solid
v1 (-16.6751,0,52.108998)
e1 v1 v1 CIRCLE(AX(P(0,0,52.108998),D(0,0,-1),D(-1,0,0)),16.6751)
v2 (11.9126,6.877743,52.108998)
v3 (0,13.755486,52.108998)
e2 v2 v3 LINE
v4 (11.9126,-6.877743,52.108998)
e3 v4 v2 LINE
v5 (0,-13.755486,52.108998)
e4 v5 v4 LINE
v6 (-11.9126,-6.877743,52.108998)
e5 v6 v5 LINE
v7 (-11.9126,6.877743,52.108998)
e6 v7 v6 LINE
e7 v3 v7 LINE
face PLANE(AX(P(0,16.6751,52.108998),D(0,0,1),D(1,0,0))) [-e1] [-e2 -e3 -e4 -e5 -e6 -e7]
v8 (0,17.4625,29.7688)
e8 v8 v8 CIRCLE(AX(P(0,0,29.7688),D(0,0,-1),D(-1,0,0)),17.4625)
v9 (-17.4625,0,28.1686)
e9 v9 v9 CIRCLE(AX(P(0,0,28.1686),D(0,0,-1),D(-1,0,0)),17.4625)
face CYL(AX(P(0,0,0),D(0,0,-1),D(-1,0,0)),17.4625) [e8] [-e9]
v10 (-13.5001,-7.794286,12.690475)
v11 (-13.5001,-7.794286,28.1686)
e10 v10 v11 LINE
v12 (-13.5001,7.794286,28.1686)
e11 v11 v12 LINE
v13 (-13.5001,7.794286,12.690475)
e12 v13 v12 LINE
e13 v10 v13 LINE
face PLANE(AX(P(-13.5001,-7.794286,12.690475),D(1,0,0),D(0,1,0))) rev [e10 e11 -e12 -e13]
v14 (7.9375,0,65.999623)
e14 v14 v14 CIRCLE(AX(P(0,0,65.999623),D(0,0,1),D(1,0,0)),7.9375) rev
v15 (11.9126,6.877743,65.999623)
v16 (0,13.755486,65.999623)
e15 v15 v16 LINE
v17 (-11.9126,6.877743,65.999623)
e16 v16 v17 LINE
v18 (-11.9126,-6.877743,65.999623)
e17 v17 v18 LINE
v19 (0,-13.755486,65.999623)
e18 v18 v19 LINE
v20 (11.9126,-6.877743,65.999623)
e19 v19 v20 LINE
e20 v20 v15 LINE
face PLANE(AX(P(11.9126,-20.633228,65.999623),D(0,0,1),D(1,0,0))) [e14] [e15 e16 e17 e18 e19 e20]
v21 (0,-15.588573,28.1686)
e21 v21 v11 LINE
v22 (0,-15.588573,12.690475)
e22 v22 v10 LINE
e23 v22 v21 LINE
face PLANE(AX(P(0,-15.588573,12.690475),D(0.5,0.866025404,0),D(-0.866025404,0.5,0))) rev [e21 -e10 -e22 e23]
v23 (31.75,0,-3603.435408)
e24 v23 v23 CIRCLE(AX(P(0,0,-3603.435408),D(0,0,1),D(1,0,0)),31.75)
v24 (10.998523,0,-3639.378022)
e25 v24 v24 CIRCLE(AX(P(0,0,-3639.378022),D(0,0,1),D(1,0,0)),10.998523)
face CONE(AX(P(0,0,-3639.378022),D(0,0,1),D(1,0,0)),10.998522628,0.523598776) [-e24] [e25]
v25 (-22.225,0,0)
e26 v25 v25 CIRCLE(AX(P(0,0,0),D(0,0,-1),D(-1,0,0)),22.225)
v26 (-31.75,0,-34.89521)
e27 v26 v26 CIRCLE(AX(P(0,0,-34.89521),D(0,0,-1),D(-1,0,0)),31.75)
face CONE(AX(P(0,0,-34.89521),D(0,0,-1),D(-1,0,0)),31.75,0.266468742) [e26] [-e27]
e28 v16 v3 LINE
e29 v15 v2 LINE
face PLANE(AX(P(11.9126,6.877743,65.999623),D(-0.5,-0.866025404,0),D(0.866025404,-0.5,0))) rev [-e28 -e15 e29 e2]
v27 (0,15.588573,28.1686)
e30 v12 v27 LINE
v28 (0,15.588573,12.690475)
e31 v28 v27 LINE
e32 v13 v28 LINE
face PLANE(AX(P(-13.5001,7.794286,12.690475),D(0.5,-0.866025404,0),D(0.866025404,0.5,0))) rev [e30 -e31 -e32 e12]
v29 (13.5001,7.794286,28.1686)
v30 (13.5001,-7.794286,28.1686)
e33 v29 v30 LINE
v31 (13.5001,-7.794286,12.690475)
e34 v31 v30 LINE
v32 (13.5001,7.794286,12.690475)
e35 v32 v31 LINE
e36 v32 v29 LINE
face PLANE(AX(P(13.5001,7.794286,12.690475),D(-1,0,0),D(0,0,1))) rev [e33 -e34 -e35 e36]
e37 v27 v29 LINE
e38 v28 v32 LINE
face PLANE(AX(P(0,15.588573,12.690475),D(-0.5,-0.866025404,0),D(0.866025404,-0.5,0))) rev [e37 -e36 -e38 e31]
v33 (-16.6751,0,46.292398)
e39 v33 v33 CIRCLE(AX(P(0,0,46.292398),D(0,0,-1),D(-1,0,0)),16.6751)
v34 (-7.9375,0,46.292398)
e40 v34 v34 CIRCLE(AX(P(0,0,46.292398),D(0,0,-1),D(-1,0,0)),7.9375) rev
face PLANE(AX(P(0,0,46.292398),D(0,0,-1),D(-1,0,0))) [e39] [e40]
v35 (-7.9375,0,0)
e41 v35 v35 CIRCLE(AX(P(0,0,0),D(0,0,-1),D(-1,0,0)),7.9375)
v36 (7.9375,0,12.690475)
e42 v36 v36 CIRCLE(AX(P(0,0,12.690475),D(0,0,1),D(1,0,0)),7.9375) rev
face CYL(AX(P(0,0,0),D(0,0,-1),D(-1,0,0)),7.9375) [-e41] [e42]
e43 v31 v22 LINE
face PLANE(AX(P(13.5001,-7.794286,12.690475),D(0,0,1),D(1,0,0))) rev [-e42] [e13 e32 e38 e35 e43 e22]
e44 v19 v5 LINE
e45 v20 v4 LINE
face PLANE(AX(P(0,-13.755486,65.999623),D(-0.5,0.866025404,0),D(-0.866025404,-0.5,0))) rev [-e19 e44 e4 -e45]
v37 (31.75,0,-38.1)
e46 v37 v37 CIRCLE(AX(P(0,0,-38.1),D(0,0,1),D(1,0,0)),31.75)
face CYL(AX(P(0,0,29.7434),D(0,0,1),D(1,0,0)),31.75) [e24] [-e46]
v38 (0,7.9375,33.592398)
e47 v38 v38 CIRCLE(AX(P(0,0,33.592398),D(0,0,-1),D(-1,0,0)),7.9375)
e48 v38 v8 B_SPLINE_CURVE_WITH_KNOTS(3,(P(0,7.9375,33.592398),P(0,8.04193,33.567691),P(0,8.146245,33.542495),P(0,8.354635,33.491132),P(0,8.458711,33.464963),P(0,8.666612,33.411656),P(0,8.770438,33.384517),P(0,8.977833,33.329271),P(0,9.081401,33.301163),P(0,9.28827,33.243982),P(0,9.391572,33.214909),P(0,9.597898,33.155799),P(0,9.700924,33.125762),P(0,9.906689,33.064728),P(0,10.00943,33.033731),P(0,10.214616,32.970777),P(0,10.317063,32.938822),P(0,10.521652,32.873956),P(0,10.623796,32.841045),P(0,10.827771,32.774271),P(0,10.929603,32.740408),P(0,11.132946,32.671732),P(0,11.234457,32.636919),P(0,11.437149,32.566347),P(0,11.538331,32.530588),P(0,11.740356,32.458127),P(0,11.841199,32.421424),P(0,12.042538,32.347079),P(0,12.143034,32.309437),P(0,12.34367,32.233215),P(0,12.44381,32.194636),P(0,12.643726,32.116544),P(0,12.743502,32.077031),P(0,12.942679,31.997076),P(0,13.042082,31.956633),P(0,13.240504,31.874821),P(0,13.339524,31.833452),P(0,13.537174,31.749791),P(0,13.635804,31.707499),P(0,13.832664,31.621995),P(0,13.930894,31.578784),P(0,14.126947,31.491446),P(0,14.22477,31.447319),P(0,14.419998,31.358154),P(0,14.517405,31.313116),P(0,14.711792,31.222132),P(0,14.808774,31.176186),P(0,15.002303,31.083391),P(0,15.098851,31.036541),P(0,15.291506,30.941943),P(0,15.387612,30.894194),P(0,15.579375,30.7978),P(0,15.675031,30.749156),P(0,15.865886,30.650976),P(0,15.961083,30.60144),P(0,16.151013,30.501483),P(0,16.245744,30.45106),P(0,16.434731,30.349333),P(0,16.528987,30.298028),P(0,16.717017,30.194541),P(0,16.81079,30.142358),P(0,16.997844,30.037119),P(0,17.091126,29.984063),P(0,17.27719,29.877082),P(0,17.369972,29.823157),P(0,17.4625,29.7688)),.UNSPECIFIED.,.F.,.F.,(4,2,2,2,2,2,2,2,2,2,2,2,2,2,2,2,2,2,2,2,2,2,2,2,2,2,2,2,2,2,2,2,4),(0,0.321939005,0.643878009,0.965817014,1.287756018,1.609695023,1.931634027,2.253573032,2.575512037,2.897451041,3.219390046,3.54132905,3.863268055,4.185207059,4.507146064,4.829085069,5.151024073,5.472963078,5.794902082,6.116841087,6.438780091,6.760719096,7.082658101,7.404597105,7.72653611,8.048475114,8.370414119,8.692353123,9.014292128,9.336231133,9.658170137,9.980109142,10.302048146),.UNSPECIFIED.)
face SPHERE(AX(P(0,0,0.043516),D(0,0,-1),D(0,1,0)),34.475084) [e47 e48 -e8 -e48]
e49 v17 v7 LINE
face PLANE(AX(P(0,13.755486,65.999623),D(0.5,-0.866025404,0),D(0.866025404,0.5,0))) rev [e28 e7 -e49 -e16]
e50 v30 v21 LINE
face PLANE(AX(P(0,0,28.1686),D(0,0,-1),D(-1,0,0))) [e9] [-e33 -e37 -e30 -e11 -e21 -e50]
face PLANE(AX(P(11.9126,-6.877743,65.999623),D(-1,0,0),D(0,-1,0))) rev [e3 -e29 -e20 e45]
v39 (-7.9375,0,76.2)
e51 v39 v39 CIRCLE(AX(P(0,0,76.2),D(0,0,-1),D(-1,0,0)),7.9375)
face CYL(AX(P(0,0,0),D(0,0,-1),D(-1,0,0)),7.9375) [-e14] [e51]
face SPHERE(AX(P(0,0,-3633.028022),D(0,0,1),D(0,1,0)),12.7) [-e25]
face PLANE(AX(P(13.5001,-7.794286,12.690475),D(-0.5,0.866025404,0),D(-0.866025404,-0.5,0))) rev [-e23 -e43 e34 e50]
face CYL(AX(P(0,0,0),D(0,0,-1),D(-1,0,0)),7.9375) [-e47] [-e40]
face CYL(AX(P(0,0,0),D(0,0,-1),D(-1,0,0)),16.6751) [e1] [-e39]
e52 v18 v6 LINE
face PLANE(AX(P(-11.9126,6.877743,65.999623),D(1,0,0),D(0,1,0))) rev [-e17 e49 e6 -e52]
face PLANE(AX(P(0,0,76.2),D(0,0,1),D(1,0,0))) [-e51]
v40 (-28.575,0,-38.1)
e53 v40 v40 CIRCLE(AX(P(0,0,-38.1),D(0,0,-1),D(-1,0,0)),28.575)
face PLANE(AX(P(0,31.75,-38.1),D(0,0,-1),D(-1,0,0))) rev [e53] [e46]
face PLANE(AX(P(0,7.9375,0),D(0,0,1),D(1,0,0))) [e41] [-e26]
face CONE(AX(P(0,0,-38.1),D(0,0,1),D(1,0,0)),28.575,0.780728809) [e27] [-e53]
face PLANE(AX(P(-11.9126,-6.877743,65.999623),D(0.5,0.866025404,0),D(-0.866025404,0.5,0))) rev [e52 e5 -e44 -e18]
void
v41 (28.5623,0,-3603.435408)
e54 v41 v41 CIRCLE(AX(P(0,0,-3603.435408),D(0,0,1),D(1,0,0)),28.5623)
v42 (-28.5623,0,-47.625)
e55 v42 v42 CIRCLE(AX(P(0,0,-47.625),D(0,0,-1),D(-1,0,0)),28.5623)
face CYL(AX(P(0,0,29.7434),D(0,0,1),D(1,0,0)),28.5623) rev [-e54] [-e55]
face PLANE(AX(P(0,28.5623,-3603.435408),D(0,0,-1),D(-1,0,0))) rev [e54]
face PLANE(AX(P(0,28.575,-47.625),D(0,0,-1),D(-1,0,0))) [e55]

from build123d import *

# Parameters (mm, degrees)
BOSS_REVOLVE3_START         = 12.690475
BOSS_REVOLVE3_OUTLINE_R     = 7.9375
BOSS_REVOLVE3_DEPTH         = 15.478125
BOSS_REVOLVE3_START_2       = 46.292398399
BOSS_REVOLVE3_2_OUTLINE_R   = 16.6751
BOSS_REVOLVE3_2_OUTLINE_R_2 = 7.9375
BOSS_REVOLVE3_2_DEPTH       = 5.8166
BOSS_EXTRUDE2_DEPTH         = 13.890625


# Read off the part's stored shape, not the designer's step: Boss-Revolve3
with BuildPart() as part:
    # Sketch1 → Base-Revolve (revolve)
    with BuildSketch(Plane(origin=(0, 0, 0), x_dir=(0, 0, -1), z_dir=(1, 0, 0)), mode=Mode.PRIVATE) as base_revolve_sk:
        Polygon((-76.2, 0), (-76.2, 7.9375), (0, 7.9375), (0, 22.225), (34.895210283, 31.75), (38.1, 28.575), (47.625, 28.575), (47.625, 0), align=None)
    revolve(base_revolve_sk.sketch.rotate(Axis((0, 0, 0), (0, 0, 1)), 90), axis=Axis((0, 0, 0), (0, 0, 1)))

    # Sketch3 → Boss-Revolve2 (revolve)
    with BuildSketch(Plane(origin=(0, 0, 0), x_dir=(0, 0, -1), z_dir=(1, 0, 0)), mode=Mode.PRIVATE) as boss_revolve2_sk:
        with BuildLine():
            Line((-28.1686, 0), (-28.1686, 17.4625))
            Line((-28.1686, 17.4625), (-29.7688, 17.4625))
            ThreePointArc((-29.7688, 17.4625), (-33.309963658, 9.048473715), (-34.5186, 0))
            Line((-34.5186, 0), (-28.1686, 0))
        make_face()
    revolve(boss_revolve2_sk.sketch.rotate(Axis((0, 0, 0), (0, 0, 1)), 90), axis=Axis((0, 0, 0), (0, 0, 1)))

    # Sketch2 → Boss-Revolve1 (revolve)
    with BuildSketch(Plane(origin=(0, 0, 0), x_dir=(0, 0, -1), z_dir=(1, 0, 0)), mode=Mode.PRIVATE) as boss_revolve1_sk:
        with BuildLine():
            Line((38.1, 31.75), (38.1, 28.5623))
            Line((38.1, 28.5623), (3603.43540845, 28.5623))
            Line((3603.43540845, 28.5623), (3603.43540845, 0))
            Line((3603.43540845, 0), (3645.72802159, 0))
            ThreePointArc((3645.72802159, 0), (3644.026544218, 6.35), (3639.37802159, 10.998522628))
            Line((3639.37802159, 10.998522628), (3603.43540845, 31.75))
            Line((3603.43540845, 31.75), (38.1, 31.75))
        make_face()
    revolve(boss_revolve1_sk.sketch.rotate(Axis((0, 0, 29.7434), (0, 0, -1)), 90), axis=Axis((0, 0, 29.7434), (0, 0, -1)))

    # Boss-Revolve3 outline → Boss-Revolve3 (add)
    with BuildSketch(Plane.XY.offset(BOSS_REVOLVE3_START)):
        Polygon((0, -15.588572738), (13.5001, -7.794286369), (13.5001, 7.794286369), (0, 15.588572738), (-13.5001, 7.794286369), (-13.5001, -7.794286369), align=None)
        Circle(BOSS_REVOLVE3_OUTLINE_R, mode=Mode.SUBTRACT)
    extrude(amount=BOSS_REVOLVE3_DEPTH)

    # Boss-Revolve3 2 outline → Boss-Revolve3 2 (add)
    with BuildSketch(Plane.XY.offset(BOSS_REVOLVE3_START_2)):
        Circle(BOSS_REVOLVE3_2_OUTLINE_R)
        Circle(BOSS_REVOLVE3_2_OUTLINE_R_2, mode=Mode.SUBTRACT)
    extrude(amount=BOSS_REVOLVE3_2_DEPTH)

    # Sketch6 → Boss-Extrude2 (add)
    with BuildSketch(Plane.XY.offset(52.108998399)):
        Polygon((0, -13.755485633), (11.9126, -6.877742817), (11.9126, 6.877742817), (0, 13.755485633), (-11.9126, 6.877742817), (-11.9126, -6.877742817), align=None)
    extrude(amount=BOSS_EXTRUDE2_DEPTH)


solid = part.part
